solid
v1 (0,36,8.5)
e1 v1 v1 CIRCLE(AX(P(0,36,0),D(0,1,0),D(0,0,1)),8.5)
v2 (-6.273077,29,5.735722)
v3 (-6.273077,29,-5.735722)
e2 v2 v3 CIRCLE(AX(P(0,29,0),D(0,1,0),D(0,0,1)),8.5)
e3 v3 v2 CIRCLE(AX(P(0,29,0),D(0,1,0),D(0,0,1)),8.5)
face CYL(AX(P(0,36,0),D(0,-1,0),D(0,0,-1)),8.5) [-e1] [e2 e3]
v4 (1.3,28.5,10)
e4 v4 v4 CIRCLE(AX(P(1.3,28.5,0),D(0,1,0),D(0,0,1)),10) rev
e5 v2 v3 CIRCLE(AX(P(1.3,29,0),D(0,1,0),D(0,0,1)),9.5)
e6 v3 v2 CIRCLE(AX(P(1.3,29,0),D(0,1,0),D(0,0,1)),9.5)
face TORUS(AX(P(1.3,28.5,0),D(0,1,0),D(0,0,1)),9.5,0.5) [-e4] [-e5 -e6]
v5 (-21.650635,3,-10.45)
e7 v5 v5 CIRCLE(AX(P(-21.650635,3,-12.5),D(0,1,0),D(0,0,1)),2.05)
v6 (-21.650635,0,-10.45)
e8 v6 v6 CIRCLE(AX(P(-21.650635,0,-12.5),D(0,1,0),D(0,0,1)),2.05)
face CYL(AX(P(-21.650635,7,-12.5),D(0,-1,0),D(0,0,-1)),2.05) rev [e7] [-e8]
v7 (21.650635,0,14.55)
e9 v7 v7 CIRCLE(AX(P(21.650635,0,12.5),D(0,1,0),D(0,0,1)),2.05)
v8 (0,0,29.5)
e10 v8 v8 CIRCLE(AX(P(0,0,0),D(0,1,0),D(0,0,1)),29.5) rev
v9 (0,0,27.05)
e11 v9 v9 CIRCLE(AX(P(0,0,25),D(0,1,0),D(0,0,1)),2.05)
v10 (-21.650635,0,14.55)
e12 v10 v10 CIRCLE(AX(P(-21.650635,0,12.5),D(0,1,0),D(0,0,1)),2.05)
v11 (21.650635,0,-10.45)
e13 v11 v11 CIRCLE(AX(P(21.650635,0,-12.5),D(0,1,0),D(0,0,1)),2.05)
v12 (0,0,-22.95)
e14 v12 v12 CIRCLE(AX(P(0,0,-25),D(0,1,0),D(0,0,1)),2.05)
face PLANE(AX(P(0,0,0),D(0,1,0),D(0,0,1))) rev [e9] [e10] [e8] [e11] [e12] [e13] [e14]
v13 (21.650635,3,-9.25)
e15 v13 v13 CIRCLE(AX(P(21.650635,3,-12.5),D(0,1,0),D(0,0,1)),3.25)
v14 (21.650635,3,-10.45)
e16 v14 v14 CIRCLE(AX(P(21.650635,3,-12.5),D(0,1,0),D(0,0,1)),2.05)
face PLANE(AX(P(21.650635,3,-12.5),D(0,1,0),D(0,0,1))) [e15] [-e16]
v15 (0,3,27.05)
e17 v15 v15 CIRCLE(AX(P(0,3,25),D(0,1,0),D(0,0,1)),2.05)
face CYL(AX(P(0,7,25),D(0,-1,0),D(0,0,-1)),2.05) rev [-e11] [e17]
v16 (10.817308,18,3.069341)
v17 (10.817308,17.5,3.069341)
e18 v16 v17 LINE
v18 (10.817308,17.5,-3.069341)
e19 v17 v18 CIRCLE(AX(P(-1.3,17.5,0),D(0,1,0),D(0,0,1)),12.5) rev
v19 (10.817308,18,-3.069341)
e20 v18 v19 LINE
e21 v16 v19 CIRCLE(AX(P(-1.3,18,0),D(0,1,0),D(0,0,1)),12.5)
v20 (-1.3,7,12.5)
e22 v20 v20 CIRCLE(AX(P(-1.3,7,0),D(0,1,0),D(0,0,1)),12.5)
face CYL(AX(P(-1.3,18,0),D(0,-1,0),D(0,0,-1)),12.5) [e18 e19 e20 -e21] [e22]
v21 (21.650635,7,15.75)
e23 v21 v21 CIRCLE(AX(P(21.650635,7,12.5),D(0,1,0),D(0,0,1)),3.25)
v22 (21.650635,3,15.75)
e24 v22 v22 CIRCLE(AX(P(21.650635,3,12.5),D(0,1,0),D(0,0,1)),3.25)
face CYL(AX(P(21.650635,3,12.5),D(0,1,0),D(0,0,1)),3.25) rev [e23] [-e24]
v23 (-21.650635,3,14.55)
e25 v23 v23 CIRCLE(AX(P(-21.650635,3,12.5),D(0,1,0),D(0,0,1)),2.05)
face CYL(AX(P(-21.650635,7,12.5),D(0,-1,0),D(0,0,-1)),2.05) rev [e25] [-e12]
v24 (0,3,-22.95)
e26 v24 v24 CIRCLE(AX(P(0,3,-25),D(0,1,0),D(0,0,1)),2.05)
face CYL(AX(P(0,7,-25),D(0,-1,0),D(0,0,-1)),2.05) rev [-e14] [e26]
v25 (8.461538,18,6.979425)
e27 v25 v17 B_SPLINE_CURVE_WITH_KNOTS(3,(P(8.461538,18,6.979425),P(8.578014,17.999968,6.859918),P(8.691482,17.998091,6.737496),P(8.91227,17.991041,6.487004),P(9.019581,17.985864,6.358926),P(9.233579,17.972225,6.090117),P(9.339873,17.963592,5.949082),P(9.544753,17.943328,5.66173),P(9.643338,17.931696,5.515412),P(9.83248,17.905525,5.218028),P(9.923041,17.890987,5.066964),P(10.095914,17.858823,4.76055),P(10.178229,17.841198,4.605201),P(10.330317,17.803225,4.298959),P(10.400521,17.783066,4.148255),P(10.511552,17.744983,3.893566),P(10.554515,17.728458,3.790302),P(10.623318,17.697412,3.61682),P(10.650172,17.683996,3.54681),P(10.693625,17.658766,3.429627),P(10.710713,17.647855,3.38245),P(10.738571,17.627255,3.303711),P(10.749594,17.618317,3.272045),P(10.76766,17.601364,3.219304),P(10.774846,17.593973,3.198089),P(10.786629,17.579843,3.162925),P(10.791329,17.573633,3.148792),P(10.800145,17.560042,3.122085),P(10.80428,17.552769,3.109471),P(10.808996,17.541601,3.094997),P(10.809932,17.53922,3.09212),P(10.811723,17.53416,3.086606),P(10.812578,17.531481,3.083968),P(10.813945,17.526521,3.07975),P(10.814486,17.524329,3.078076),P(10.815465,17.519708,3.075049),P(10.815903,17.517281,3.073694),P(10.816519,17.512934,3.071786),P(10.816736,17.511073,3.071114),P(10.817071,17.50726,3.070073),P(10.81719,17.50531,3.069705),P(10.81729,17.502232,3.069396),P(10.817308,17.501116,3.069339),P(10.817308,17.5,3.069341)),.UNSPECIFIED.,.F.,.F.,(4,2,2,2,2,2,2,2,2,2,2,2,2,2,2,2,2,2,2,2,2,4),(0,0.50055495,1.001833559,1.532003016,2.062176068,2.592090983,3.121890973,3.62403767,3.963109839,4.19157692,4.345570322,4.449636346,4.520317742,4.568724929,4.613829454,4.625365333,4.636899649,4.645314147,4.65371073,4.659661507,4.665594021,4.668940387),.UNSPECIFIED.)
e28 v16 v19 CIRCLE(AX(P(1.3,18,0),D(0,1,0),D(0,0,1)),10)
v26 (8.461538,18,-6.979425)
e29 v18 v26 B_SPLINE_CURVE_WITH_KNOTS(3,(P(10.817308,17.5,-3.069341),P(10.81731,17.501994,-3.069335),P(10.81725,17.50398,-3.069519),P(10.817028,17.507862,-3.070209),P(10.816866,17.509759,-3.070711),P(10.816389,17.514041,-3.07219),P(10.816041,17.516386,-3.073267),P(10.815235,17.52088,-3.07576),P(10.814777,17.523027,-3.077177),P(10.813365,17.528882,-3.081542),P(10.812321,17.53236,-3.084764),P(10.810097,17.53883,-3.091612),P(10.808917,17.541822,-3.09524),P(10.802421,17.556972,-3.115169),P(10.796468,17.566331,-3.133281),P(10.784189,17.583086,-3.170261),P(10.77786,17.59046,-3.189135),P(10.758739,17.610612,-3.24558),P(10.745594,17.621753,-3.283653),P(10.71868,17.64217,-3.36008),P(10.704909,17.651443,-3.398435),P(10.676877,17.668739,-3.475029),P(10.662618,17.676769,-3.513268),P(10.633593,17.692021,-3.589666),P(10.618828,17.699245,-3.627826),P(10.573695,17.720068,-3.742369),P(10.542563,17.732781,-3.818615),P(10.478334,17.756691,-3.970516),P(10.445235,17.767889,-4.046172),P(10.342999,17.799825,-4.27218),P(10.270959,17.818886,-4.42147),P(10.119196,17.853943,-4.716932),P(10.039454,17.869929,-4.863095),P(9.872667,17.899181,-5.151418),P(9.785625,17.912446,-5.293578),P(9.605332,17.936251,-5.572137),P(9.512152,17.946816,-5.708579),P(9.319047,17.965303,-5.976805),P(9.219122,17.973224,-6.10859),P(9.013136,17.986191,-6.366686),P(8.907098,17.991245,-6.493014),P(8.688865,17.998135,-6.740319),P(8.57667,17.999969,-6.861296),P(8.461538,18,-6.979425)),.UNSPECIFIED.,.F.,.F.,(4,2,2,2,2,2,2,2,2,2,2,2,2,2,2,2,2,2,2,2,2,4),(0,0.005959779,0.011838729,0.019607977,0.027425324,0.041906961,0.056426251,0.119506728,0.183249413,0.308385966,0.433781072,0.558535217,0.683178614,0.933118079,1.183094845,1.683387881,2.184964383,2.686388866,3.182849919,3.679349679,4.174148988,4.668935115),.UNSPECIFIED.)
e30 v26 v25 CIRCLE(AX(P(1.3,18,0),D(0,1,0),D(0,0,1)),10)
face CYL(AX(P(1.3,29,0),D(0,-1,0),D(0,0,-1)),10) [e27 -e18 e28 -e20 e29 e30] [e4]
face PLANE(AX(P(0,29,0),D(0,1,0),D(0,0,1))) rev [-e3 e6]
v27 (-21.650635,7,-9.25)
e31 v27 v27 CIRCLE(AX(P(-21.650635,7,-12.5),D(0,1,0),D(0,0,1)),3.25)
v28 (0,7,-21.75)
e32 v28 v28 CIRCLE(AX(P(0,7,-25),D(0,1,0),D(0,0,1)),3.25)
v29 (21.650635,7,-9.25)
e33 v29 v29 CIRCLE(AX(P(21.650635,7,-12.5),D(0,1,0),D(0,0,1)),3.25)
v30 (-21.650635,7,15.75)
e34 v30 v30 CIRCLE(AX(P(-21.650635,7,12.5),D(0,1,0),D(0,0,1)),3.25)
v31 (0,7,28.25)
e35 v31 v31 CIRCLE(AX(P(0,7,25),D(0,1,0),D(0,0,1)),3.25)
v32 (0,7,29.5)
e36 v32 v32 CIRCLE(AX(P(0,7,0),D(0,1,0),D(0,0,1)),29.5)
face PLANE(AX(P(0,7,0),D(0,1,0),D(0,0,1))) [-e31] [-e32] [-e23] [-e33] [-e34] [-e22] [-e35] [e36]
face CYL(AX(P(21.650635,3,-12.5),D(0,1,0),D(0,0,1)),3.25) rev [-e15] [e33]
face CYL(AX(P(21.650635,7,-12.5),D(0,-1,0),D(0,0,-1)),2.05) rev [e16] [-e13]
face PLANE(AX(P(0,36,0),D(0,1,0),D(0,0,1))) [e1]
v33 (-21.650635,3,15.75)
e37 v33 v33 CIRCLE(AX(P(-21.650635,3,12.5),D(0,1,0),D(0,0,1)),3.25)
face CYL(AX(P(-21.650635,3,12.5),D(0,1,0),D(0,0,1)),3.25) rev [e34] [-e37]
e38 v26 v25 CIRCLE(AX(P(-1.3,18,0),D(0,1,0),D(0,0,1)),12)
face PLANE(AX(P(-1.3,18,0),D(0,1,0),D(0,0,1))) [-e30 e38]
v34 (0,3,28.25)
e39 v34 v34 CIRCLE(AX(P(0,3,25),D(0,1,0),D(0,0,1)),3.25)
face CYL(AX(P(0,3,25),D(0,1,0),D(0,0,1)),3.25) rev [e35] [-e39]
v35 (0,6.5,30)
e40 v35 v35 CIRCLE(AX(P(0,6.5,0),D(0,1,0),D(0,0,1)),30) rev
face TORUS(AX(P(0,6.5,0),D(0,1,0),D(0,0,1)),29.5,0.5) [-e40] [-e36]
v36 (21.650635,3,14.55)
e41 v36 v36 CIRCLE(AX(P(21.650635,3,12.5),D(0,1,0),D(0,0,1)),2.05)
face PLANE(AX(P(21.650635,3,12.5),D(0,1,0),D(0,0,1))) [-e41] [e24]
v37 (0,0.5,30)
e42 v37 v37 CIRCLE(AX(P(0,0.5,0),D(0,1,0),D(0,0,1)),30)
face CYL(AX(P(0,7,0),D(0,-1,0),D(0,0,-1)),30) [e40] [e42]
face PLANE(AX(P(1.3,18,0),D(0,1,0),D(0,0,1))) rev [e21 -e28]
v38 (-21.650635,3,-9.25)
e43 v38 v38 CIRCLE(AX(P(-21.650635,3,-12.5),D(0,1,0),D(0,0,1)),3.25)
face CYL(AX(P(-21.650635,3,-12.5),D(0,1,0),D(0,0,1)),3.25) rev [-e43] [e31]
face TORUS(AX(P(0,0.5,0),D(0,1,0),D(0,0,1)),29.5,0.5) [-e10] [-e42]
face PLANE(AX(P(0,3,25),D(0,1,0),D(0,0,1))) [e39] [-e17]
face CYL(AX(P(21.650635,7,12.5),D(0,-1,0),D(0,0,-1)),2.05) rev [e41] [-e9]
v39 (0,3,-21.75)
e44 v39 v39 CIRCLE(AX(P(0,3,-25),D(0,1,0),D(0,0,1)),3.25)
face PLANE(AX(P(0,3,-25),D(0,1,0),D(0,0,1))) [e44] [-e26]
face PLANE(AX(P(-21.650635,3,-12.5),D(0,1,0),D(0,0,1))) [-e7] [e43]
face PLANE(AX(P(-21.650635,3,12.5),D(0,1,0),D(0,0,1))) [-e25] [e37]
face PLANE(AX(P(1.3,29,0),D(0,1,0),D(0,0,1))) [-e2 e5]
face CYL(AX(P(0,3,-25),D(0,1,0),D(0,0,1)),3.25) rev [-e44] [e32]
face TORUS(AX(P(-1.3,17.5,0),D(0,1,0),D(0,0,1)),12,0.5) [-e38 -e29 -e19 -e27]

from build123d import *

# Parameters (mm, degrees)
SKETCH1_R           = 30
SKETCH1_R_2         = 2.05
BOSS_EXTRUDE1_DEPTH = 7
SKETCH2_R           = 12.5
BOSS_EXTRUDE2_DEPTH = 11
SKETCH3_R           = 10
BOSS_EXTRUDE3_DEPTH = 11
FILLET1_R           = 0.5
SKETCH4_R           = 3.25
CUT_EXTRUDE1_DEPTH  = 4
SKETCH5_R           = 8.5
BOSS_EXTRUDE4_DEPTH = 7


with BuildPart() as part:
    # Sketch1 → Boss-Extrude1 (new body)
    with BuildSketch(Plane(origin=(0, 0, 0), x_dir=(1, 0, 0), z_dir=(0, 1, 0))):
        Circle(SKETCH1_R)
        with Locations((0, 25)):
            Circle(SKETCH1_R_2, mode=Mode.SUBTRACT)
        with Locations((21.650635095, 12.5)):
            Circle(SKETCH1_R_2, mode=Mode.SUBTRACT)
        with Locations((21.650635095, -12.5)):
            Circle(SKETCH1_R_2, mode=Mode.SUBTRACT)
        with Locations((0, -25)):
            Circle(SKETCH1_R_2, mode=Mode.SUBTRACT)
        with Locations((-21.650635095, -12.5)):
            Circle(SKETCH1_R_2, mode=Mode.SUBTRACT)
        with Locations((-21.650635095, 12.5)):
            Circle(SKETCH1_R_2, mode=Mode.SUBTRACT)
    extrude(amount=BOSS_EXTRUDE1_DEPTH)

    # Sketch2 → Boss-Extrude2 (add)
    with BuildSketch(Plane(origin=(0, 7, 0), x_dir=(1, 0, 0), z_dir=(0, 1, 0))):
        with Locations((-1.3, 0)):
            Circle(SKETCH2_R)
    extrude(amount=BOSS_EXTRUDE2_DEPTH)

    # Sketch3 → Boss-Extrude3 (add)
    with BuildSketch(Plane(origin=(0, 18, 0), x_dir=(1, 0, 0), z_dir=(0, 1, 0))):
        with Locations((1.3, 0)):
            Circle(SKETCH3_R)
    extrude(amount=BOSS_EXTRUDE3_DEPTH)

    # Fillet1
    fillet1_edges = [part.edges().sort_by_distance(p)[0] for p in [
        (-8.7, 29, 0),
        (-13.8, 18, 0),
        (-30, 0, 0),
        (-30, 7, 0),
    ]]
    fillet(fillet1_edges, radius=FILLET1_R)

    # Sketch4 → Cut-Extrude1 (cut)
    with BuildSketch(Plane(origin=(0, 7, 0), x_dir=(1, 0, 0), z_dir=(0, 1, 0))):
        with Locations((0, 25)):
            Circle(SKETCH4_R)
        with Locations((21.650635095, 12.5)):
            Circle(SKETCH4_R)
        with Locations((21.650635095, -12.5)):
            Circle(SKETCH4_R)
        with Locations((0, -25)):
            Circle(SKETCH4_R)
        with Locations((-21.650635095, -12.5)):
            Circle(SKETCH4_R)
        with Locations((-21.650635095, 12.5)):
            Circle(SKETCH4_R)
    extrude(amount=-CUT_EXTRUDE1_DEPTH, mode=Mode.SUBTRACT)

    # Sketch5 → Boss-Extrude4 (add)
    with BuildSketch(Plane(origin=(0, 29, 0), x_dir=(1, 0, 0), z_dir=(0, 1, 0))):
        Circle(SKETCH5_R)
    extrude(amount=BOSS_EXTRUDE4_DEPTH)


solid = part.part
